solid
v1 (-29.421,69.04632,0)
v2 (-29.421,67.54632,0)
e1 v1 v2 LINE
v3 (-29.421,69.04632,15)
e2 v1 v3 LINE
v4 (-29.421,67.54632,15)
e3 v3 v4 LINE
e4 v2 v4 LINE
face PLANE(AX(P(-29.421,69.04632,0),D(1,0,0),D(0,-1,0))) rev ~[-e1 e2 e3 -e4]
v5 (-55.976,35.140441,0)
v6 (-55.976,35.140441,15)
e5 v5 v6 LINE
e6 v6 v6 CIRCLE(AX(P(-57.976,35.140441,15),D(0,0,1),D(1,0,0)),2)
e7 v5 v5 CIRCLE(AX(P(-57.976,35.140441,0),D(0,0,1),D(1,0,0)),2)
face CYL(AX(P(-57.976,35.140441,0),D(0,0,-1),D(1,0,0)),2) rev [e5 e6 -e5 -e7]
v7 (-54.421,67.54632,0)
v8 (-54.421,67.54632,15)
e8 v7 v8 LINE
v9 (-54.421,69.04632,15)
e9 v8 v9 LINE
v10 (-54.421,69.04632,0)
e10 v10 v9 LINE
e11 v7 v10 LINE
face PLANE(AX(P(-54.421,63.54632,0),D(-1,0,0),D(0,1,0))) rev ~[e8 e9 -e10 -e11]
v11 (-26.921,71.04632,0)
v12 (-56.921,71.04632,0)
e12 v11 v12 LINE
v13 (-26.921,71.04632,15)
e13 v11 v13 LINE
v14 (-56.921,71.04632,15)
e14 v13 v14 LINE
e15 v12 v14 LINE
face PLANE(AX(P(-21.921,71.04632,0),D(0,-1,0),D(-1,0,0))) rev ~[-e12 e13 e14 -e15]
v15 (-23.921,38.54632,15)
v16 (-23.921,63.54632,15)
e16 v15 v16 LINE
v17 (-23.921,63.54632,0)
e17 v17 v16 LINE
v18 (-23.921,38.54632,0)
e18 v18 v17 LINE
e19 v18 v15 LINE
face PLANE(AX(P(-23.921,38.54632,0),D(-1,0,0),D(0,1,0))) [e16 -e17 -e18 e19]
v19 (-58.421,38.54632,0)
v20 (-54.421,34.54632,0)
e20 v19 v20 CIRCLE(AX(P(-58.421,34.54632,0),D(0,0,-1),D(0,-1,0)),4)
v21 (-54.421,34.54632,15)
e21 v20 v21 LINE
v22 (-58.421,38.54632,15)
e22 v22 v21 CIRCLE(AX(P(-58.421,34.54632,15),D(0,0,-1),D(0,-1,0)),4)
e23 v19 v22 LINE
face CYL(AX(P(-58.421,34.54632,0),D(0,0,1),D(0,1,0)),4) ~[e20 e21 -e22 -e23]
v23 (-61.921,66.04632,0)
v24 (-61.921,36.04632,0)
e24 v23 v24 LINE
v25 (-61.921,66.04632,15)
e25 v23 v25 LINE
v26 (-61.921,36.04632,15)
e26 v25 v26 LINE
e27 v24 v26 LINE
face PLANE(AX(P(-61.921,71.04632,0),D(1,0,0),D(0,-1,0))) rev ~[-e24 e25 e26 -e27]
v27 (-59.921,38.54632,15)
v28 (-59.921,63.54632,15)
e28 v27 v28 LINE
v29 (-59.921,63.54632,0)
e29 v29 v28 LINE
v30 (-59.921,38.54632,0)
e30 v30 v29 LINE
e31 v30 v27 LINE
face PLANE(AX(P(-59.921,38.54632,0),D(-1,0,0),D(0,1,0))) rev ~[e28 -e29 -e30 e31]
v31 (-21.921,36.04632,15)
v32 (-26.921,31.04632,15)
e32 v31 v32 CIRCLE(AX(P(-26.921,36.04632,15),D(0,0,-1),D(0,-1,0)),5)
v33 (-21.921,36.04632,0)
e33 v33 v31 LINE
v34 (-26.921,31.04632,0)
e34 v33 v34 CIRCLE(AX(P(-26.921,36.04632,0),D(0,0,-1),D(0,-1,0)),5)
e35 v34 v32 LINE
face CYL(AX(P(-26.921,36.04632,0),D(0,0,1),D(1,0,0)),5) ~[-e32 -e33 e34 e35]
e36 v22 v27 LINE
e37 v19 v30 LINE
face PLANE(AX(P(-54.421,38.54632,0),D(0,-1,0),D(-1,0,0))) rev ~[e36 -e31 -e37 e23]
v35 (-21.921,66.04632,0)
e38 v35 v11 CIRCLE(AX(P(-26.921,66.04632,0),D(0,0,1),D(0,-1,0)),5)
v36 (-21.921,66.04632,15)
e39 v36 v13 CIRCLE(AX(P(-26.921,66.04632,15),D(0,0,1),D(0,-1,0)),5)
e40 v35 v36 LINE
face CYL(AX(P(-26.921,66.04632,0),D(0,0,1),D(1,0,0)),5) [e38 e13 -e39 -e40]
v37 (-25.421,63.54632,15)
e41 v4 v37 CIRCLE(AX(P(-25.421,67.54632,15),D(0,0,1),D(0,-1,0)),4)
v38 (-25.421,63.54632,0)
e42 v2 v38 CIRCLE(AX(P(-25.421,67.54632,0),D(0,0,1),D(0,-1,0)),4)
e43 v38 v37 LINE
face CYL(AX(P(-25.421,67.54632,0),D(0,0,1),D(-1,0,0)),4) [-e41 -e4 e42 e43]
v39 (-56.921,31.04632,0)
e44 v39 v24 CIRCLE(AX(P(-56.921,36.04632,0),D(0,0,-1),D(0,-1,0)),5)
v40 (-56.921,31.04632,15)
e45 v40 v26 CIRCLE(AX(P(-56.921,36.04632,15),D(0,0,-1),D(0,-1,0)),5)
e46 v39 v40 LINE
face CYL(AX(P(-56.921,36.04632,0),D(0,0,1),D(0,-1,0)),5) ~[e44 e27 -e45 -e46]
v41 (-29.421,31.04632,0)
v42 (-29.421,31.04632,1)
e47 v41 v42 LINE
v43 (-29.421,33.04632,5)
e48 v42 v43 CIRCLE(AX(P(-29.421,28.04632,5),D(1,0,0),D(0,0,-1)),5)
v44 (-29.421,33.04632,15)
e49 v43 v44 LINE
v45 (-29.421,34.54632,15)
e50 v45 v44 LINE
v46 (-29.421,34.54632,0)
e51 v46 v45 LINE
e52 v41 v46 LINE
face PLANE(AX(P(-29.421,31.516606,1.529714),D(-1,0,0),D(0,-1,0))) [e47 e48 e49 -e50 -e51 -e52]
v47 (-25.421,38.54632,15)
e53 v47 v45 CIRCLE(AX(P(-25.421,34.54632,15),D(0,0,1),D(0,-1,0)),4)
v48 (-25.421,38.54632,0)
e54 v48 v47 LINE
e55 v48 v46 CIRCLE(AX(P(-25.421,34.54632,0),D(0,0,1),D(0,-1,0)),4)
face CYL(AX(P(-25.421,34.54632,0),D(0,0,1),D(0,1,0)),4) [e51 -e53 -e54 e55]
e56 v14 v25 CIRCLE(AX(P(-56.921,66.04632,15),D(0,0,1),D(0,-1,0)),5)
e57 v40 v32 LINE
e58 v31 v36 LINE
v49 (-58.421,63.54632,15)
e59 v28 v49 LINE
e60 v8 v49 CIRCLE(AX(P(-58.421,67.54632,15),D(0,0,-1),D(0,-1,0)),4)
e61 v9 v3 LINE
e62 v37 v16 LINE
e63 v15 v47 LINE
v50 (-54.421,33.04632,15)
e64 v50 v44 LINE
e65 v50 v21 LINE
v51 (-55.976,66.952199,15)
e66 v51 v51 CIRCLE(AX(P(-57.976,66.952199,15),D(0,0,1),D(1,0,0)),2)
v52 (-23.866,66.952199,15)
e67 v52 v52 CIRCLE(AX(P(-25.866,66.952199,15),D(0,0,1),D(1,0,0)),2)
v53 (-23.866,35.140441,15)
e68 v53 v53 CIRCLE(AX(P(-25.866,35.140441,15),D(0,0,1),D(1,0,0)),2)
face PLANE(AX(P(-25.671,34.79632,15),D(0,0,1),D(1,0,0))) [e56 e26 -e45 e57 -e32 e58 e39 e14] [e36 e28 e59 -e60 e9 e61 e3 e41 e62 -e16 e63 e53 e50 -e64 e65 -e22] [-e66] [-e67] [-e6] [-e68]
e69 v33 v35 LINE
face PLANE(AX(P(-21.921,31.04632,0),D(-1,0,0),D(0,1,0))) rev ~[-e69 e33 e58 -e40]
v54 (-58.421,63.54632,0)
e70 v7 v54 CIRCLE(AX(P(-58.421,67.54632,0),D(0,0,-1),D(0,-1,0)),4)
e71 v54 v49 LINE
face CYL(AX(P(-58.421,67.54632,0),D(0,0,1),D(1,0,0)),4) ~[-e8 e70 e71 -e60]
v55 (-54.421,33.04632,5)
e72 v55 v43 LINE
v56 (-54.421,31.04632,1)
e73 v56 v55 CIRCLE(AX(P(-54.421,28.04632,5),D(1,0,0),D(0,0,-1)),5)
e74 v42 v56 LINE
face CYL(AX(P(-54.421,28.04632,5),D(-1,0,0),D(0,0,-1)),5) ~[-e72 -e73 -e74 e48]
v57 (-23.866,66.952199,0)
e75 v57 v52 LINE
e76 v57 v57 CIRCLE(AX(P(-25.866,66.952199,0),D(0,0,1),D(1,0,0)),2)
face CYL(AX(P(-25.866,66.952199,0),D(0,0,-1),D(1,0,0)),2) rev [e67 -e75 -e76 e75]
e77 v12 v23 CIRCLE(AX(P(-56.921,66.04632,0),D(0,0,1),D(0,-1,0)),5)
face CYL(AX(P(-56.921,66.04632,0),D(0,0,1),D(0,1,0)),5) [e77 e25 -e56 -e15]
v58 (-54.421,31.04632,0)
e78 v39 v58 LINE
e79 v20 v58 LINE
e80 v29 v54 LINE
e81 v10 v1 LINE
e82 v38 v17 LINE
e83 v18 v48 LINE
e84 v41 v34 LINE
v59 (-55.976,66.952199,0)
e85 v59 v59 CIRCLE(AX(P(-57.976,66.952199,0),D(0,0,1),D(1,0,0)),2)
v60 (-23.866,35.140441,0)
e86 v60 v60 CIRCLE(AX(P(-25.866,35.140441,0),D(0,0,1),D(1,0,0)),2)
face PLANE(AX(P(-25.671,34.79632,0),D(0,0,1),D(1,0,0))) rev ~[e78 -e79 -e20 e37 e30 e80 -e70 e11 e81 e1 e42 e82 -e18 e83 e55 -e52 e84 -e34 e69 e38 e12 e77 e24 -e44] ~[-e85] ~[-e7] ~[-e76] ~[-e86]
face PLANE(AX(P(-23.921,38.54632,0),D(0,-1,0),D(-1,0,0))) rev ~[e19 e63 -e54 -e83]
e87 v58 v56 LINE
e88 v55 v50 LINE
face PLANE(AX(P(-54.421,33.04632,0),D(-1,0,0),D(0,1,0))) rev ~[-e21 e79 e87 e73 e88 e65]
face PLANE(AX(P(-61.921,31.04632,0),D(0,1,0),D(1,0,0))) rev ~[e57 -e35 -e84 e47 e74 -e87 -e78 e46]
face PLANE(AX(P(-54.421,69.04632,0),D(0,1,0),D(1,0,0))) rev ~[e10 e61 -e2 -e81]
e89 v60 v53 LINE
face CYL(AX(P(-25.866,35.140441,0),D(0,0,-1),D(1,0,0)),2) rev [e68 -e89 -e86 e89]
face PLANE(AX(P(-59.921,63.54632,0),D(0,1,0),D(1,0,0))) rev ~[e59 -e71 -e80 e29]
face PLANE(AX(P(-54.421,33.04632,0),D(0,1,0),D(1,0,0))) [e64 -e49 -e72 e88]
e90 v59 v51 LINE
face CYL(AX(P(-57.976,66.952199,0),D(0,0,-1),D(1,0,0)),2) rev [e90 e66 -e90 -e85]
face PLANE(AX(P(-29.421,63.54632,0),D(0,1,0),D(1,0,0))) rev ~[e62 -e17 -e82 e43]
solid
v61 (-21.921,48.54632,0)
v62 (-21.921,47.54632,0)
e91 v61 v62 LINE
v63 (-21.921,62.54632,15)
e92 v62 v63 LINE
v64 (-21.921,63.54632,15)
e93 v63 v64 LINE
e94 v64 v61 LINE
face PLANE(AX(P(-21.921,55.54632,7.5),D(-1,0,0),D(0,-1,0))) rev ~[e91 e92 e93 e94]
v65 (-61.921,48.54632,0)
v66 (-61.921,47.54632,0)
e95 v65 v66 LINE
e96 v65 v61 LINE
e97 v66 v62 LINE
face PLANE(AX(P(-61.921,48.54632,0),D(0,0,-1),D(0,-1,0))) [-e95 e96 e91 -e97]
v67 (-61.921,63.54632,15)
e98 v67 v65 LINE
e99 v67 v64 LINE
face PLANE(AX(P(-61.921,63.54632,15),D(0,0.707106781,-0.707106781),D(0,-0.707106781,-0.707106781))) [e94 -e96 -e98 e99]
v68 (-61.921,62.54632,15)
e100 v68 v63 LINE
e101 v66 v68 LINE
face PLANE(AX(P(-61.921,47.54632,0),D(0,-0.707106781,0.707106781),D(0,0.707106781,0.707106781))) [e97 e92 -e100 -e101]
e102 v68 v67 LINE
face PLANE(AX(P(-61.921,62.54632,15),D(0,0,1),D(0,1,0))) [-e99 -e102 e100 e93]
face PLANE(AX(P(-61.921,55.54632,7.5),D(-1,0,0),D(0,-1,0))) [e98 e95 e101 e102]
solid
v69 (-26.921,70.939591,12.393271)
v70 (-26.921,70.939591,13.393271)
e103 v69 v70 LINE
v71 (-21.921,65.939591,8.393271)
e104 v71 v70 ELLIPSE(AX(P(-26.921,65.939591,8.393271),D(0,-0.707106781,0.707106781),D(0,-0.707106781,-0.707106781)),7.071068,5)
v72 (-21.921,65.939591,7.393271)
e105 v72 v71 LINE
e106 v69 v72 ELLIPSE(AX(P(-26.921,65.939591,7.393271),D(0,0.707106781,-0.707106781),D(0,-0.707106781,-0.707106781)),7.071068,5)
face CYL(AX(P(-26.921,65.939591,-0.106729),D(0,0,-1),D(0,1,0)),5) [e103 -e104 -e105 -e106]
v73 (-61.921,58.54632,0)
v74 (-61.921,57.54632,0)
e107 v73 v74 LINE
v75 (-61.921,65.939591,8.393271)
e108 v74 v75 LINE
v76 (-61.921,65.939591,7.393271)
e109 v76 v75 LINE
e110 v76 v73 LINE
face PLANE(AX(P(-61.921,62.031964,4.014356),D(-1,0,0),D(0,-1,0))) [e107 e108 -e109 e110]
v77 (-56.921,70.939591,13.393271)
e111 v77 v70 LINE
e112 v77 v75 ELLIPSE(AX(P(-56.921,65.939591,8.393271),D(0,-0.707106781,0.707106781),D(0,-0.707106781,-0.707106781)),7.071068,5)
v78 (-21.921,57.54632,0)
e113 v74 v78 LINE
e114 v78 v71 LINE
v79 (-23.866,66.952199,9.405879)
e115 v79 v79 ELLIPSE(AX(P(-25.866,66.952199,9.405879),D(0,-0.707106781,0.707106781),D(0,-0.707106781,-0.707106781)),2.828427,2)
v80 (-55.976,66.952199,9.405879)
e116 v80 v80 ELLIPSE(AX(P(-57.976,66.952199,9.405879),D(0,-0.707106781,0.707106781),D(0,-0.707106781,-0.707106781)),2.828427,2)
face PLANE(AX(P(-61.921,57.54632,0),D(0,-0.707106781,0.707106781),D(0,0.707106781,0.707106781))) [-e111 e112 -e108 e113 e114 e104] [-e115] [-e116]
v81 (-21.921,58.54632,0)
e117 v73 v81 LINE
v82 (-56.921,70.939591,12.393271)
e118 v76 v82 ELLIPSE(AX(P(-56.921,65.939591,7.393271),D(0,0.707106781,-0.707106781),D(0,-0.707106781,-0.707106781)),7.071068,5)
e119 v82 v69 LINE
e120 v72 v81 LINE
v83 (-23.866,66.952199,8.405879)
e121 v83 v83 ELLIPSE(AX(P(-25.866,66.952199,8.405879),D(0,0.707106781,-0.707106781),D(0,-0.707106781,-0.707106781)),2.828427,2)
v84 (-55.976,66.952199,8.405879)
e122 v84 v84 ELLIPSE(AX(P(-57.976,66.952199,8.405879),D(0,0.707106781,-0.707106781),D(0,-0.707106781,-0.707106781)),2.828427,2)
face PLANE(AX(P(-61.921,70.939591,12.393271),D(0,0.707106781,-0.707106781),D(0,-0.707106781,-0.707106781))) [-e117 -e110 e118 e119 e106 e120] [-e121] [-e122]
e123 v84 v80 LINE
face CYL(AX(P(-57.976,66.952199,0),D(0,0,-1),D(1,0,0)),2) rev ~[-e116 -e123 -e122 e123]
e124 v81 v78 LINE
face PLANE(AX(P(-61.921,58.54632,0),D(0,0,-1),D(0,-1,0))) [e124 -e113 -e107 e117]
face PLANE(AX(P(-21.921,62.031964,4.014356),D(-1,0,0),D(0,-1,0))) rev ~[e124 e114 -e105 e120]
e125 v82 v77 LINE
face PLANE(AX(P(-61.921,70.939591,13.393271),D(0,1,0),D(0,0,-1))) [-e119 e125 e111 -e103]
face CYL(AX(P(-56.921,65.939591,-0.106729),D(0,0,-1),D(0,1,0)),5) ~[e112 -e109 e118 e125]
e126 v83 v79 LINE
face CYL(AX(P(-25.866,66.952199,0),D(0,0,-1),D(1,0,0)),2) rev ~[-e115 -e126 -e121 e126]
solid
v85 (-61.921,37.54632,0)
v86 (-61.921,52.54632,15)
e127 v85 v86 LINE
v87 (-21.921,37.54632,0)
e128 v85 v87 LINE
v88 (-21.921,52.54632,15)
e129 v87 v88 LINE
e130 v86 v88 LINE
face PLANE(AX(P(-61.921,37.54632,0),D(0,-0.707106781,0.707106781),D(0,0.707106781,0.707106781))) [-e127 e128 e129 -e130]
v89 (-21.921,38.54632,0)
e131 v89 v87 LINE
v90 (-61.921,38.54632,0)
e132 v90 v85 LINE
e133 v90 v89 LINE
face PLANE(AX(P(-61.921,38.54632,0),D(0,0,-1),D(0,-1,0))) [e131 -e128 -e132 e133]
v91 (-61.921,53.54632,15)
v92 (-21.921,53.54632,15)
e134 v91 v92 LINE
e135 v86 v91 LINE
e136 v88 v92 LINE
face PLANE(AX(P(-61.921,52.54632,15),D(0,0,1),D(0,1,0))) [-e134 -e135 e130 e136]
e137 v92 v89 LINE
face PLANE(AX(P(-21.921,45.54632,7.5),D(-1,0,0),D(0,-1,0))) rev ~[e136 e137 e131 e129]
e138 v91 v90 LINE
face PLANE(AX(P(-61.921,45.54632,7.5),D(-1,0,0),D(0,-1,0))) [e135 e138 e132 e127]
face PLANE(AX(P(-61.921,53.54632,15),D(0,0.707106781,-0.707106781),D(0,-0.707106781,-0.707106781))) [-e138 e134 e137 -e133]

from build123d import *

# Parameters (mm, degrees)
F0_R        = 2
F0_W        = 25
F0_H        = 2
F0_W_2      = 2
F0_H_2      = 25
F1_DEPTH    = 15
F2_R        = 5
F3_R        = 4
F5_DEPTH    = 40
F6_T1_DEPTH = 26
F7_R        = 2
F8_DEPTH    = 25
F9_T1_DEPTH = 25


# Not quite as in the source:
# - a fillet or chamfer that OpenCascade refuses, or shapes differently, is made with other operations: its cross-section is extruded or revolved along the edge and cut away or added


with BuildPart() as f1:
    # F0 (on Top) → F1 (new body)
    with BuildSketch(Plane.XY):
        Polygon((-29.4209998254, 31.0463201136), (-21.9209998254, 31.0463201136), (-21.9209998254, 38.5463201136), (-23.9209998254, 38.5463201136), (-29.4209998254, 38.5463201136), (-29.4209998254, 33.0463201136), align=None)
        with Locations((-25.8659998254, 35.1404414833)):
            Circle(F0_R, mode=Mode.SUBTRACT)
        with Locations((-41.9209998254, 32.0463201136)):
            Rectangle(F0_W, F0_H)
        with Locations((-22.9209998254, 51.0463201136)):
            Rectangle(F0_W_2, F0_H_2)
        Polygon((-61.9209998254, 31.0463201136), (-54.4209998254, 31.0463201136), (-54.4209998254, 33.0463201136), (-54.4209998254, 38.5463201136), (-59.9209998254, 38.5463201136), (-61.9209998254, 38.5463201136), align=None)
        with Locations((-57.9759998254, 35.1404414833)):
            Circle(F0_R, mode=Mode.SUBTRACT)
        Polygon((-23.9209998254, 63.5463201136), (-21.9209998254, 63.5463201136), (-21.9209998254, 71.0463201136), (-29.4209998254, 71.0463201136), (-29.4209998254, 69.0463201136), (-29.4209998254, 63.5463201136), align=None)
        with Locations((-25.8659998254, 66.9521987438)):
            Circle(F0_R, mode=Mode.SUBTRACT)
        with Locations((-60.9209998254, 51.0463201136)):
            Rectangle(F0_W_2, F0_H_2)
        with Locations((-41.9209998254, 70.0463201136)):
            Rectangle(F0_W, F0_H)
        Polygon((-61.9209998254, 71.0463201136), (-61.9209998254, 63.5463201136), (-59.9209998254, 63.5463201136), (-54.4209998254, 63.5463201136), (-54.4209998254, 69.0463201136), (-54.4209998254, 71.0463201136), align=None)
        with Locations((-57.9759998254, 66.9521987438)):
            Circle(F0_R, mode=Mode.SUBTRACT)
    extrude(amount=F1_DEPTH)

    # F2
    f2_edges = [f1.edges().sort_by_distance(p)[0] for p in [
        (-61.921, 71.04632, 7.5),
        (-61.921, 31.04632, 7.5),
        (-21.921, 31.04632, 7.5),
        (-21.921, 71.04632, 7.5),
    ]]
    fillet(f2_edges, radius=F2_R)

    # F3
    f3_edges = [f1.edges().sort_by_distance(p)[0] for p in [
        (-54.421, 63.54632, 7.5),
        (-29.421, 63.54632, 7.5),
        (-29.421, 38.54632, 7.5),
        (-54.421, 38.54632, 7.5),
    ]]
    fillet(f3_edges, radius=F3_R)

    # F9: fillet of radius 5 on 1 edges, made by hand

    # F9_s2 → F9_t1 (cut)
    with BuildSketch(Plane.YZ.offset(-54.4209998254)):
        with BuildLine():
            ThreePointArc((28.0463201136, 0), (31.5818540195, 1.4644660941), (33.0463201136, 5))
            Line((33.0463201136, 5), (33.0463201136, 0))
            Line((33.0463201136, 0), (28.0463201136, 0))
        make_face()
    extrude(amount=F9_T1_DEPTH, mode=Mode.SUBTRACT)


with BuildPart() as f5:
    # F4 (on face) → F5 (new body)
    with BuildSketch(Plane(origin=(-61.9209998254, 0, 0), x_dir=(0, -1, 0), z_dir=(-1, 0, 0))):
        Polygon((-66.0463201136, 8.5), (-66.0463201136, 7.5), (-58.5463201136, 0), (-57.5463201136, 0), align=None)
        Polygon((-70.9395914093, 12.3932712957), (-66.0463201136, 7.5), (-66.0463201136, 8.5), (-70.9395914093, 13.3932712957), align=None)
    extrude(amount=-F5_DEPTH)

    # F6: fillet of radius 5 on 2 edges, made by hand

    # F6_s2 → F6_t1 (cut)
    with BuildSketch(Plane.XY.offset(-0.1067287043)):
        with BuildLine():
            ThreePointArc((-56.9209998254, 70.9395914093), (-60.4565337313, 69.4751253152), (-61.9209998254, 65.9395914093))
            Line((-61.9209998254, 65.9395914093), (-61.9209998254, 70.9395914093))
            Line((-61.9209998254, 70.9395914093), (-56.9209998254, 70.9395914093))
        make_face()
        with BuildLine():
            ThreePointArc((-26.9209998254, 70.9395914093), (-23.3854659194, 69.4751253152), (-21.9209998254, 65.9395914093))
            Line((-21.9209998254, 65.9395914093), (-21.9209998254, 70.9395914093))
            Line((-21.9209998254, 70.9395914093), (-26.9209998254, 70.9395914093))
        make_face()
    extrude(amount=F6_T1_DEPTH, mode=Mode.SUBTRACT)

    # F7 (on face) → F8 (cut)
    with BuildSketch(Plane(origin=(0, 0, 0), x_dir=(1, 0, 0), z_dir=(0, 0, -1))):
        with Locations((-25.8659998254, -66.9521987438)):
            Circle(F7_R)
        with Locations((-57.9759998254, -66.9521987438)):
            Circle(F7_R)
    extrude(amount=-F8_DEPTH, mode=Mode.SUBTRACT)


with BuildPart() as f5b:
    # F4 (on face) → F5, piece 2 (new body)
    with BuildSketch(Plane(origin=(-61.9209998254, 0, 0), x_dir=(0, -1, 0), z_dir=(-1, 0, 0))):
        Polygon((-63.5463201136, 15), (-56.0463201136, 7.5), (-48.5463201136, 0), (-47.5463201136, 0), (-56.0463201136, 8.5), (-62.5463201136, 15), align=None)
    extrude(amount=-F5_DEPTH)


with BuildPart() as f5c:
    # F4 (on face) → F5, piece 3 (new body)
    with BuildSketch(Plane(origin=(-61.9209998254, 0, 0), x_dir=(0, -1, 0), z_dir=(-1, 0, 0))):
        Polygon((-53.5463201136, 15), (-46.0463201136, 7.5), (-38.5463201136, 0), (-37.5463201136, 0), (-46.0463201136, 8.5), (-52.5463201136, 15), align=None)
    extrude(amount=-F5_DEPTH)


solid = Compound([f1.part, f5.part, f5b.part, f5c.part])
